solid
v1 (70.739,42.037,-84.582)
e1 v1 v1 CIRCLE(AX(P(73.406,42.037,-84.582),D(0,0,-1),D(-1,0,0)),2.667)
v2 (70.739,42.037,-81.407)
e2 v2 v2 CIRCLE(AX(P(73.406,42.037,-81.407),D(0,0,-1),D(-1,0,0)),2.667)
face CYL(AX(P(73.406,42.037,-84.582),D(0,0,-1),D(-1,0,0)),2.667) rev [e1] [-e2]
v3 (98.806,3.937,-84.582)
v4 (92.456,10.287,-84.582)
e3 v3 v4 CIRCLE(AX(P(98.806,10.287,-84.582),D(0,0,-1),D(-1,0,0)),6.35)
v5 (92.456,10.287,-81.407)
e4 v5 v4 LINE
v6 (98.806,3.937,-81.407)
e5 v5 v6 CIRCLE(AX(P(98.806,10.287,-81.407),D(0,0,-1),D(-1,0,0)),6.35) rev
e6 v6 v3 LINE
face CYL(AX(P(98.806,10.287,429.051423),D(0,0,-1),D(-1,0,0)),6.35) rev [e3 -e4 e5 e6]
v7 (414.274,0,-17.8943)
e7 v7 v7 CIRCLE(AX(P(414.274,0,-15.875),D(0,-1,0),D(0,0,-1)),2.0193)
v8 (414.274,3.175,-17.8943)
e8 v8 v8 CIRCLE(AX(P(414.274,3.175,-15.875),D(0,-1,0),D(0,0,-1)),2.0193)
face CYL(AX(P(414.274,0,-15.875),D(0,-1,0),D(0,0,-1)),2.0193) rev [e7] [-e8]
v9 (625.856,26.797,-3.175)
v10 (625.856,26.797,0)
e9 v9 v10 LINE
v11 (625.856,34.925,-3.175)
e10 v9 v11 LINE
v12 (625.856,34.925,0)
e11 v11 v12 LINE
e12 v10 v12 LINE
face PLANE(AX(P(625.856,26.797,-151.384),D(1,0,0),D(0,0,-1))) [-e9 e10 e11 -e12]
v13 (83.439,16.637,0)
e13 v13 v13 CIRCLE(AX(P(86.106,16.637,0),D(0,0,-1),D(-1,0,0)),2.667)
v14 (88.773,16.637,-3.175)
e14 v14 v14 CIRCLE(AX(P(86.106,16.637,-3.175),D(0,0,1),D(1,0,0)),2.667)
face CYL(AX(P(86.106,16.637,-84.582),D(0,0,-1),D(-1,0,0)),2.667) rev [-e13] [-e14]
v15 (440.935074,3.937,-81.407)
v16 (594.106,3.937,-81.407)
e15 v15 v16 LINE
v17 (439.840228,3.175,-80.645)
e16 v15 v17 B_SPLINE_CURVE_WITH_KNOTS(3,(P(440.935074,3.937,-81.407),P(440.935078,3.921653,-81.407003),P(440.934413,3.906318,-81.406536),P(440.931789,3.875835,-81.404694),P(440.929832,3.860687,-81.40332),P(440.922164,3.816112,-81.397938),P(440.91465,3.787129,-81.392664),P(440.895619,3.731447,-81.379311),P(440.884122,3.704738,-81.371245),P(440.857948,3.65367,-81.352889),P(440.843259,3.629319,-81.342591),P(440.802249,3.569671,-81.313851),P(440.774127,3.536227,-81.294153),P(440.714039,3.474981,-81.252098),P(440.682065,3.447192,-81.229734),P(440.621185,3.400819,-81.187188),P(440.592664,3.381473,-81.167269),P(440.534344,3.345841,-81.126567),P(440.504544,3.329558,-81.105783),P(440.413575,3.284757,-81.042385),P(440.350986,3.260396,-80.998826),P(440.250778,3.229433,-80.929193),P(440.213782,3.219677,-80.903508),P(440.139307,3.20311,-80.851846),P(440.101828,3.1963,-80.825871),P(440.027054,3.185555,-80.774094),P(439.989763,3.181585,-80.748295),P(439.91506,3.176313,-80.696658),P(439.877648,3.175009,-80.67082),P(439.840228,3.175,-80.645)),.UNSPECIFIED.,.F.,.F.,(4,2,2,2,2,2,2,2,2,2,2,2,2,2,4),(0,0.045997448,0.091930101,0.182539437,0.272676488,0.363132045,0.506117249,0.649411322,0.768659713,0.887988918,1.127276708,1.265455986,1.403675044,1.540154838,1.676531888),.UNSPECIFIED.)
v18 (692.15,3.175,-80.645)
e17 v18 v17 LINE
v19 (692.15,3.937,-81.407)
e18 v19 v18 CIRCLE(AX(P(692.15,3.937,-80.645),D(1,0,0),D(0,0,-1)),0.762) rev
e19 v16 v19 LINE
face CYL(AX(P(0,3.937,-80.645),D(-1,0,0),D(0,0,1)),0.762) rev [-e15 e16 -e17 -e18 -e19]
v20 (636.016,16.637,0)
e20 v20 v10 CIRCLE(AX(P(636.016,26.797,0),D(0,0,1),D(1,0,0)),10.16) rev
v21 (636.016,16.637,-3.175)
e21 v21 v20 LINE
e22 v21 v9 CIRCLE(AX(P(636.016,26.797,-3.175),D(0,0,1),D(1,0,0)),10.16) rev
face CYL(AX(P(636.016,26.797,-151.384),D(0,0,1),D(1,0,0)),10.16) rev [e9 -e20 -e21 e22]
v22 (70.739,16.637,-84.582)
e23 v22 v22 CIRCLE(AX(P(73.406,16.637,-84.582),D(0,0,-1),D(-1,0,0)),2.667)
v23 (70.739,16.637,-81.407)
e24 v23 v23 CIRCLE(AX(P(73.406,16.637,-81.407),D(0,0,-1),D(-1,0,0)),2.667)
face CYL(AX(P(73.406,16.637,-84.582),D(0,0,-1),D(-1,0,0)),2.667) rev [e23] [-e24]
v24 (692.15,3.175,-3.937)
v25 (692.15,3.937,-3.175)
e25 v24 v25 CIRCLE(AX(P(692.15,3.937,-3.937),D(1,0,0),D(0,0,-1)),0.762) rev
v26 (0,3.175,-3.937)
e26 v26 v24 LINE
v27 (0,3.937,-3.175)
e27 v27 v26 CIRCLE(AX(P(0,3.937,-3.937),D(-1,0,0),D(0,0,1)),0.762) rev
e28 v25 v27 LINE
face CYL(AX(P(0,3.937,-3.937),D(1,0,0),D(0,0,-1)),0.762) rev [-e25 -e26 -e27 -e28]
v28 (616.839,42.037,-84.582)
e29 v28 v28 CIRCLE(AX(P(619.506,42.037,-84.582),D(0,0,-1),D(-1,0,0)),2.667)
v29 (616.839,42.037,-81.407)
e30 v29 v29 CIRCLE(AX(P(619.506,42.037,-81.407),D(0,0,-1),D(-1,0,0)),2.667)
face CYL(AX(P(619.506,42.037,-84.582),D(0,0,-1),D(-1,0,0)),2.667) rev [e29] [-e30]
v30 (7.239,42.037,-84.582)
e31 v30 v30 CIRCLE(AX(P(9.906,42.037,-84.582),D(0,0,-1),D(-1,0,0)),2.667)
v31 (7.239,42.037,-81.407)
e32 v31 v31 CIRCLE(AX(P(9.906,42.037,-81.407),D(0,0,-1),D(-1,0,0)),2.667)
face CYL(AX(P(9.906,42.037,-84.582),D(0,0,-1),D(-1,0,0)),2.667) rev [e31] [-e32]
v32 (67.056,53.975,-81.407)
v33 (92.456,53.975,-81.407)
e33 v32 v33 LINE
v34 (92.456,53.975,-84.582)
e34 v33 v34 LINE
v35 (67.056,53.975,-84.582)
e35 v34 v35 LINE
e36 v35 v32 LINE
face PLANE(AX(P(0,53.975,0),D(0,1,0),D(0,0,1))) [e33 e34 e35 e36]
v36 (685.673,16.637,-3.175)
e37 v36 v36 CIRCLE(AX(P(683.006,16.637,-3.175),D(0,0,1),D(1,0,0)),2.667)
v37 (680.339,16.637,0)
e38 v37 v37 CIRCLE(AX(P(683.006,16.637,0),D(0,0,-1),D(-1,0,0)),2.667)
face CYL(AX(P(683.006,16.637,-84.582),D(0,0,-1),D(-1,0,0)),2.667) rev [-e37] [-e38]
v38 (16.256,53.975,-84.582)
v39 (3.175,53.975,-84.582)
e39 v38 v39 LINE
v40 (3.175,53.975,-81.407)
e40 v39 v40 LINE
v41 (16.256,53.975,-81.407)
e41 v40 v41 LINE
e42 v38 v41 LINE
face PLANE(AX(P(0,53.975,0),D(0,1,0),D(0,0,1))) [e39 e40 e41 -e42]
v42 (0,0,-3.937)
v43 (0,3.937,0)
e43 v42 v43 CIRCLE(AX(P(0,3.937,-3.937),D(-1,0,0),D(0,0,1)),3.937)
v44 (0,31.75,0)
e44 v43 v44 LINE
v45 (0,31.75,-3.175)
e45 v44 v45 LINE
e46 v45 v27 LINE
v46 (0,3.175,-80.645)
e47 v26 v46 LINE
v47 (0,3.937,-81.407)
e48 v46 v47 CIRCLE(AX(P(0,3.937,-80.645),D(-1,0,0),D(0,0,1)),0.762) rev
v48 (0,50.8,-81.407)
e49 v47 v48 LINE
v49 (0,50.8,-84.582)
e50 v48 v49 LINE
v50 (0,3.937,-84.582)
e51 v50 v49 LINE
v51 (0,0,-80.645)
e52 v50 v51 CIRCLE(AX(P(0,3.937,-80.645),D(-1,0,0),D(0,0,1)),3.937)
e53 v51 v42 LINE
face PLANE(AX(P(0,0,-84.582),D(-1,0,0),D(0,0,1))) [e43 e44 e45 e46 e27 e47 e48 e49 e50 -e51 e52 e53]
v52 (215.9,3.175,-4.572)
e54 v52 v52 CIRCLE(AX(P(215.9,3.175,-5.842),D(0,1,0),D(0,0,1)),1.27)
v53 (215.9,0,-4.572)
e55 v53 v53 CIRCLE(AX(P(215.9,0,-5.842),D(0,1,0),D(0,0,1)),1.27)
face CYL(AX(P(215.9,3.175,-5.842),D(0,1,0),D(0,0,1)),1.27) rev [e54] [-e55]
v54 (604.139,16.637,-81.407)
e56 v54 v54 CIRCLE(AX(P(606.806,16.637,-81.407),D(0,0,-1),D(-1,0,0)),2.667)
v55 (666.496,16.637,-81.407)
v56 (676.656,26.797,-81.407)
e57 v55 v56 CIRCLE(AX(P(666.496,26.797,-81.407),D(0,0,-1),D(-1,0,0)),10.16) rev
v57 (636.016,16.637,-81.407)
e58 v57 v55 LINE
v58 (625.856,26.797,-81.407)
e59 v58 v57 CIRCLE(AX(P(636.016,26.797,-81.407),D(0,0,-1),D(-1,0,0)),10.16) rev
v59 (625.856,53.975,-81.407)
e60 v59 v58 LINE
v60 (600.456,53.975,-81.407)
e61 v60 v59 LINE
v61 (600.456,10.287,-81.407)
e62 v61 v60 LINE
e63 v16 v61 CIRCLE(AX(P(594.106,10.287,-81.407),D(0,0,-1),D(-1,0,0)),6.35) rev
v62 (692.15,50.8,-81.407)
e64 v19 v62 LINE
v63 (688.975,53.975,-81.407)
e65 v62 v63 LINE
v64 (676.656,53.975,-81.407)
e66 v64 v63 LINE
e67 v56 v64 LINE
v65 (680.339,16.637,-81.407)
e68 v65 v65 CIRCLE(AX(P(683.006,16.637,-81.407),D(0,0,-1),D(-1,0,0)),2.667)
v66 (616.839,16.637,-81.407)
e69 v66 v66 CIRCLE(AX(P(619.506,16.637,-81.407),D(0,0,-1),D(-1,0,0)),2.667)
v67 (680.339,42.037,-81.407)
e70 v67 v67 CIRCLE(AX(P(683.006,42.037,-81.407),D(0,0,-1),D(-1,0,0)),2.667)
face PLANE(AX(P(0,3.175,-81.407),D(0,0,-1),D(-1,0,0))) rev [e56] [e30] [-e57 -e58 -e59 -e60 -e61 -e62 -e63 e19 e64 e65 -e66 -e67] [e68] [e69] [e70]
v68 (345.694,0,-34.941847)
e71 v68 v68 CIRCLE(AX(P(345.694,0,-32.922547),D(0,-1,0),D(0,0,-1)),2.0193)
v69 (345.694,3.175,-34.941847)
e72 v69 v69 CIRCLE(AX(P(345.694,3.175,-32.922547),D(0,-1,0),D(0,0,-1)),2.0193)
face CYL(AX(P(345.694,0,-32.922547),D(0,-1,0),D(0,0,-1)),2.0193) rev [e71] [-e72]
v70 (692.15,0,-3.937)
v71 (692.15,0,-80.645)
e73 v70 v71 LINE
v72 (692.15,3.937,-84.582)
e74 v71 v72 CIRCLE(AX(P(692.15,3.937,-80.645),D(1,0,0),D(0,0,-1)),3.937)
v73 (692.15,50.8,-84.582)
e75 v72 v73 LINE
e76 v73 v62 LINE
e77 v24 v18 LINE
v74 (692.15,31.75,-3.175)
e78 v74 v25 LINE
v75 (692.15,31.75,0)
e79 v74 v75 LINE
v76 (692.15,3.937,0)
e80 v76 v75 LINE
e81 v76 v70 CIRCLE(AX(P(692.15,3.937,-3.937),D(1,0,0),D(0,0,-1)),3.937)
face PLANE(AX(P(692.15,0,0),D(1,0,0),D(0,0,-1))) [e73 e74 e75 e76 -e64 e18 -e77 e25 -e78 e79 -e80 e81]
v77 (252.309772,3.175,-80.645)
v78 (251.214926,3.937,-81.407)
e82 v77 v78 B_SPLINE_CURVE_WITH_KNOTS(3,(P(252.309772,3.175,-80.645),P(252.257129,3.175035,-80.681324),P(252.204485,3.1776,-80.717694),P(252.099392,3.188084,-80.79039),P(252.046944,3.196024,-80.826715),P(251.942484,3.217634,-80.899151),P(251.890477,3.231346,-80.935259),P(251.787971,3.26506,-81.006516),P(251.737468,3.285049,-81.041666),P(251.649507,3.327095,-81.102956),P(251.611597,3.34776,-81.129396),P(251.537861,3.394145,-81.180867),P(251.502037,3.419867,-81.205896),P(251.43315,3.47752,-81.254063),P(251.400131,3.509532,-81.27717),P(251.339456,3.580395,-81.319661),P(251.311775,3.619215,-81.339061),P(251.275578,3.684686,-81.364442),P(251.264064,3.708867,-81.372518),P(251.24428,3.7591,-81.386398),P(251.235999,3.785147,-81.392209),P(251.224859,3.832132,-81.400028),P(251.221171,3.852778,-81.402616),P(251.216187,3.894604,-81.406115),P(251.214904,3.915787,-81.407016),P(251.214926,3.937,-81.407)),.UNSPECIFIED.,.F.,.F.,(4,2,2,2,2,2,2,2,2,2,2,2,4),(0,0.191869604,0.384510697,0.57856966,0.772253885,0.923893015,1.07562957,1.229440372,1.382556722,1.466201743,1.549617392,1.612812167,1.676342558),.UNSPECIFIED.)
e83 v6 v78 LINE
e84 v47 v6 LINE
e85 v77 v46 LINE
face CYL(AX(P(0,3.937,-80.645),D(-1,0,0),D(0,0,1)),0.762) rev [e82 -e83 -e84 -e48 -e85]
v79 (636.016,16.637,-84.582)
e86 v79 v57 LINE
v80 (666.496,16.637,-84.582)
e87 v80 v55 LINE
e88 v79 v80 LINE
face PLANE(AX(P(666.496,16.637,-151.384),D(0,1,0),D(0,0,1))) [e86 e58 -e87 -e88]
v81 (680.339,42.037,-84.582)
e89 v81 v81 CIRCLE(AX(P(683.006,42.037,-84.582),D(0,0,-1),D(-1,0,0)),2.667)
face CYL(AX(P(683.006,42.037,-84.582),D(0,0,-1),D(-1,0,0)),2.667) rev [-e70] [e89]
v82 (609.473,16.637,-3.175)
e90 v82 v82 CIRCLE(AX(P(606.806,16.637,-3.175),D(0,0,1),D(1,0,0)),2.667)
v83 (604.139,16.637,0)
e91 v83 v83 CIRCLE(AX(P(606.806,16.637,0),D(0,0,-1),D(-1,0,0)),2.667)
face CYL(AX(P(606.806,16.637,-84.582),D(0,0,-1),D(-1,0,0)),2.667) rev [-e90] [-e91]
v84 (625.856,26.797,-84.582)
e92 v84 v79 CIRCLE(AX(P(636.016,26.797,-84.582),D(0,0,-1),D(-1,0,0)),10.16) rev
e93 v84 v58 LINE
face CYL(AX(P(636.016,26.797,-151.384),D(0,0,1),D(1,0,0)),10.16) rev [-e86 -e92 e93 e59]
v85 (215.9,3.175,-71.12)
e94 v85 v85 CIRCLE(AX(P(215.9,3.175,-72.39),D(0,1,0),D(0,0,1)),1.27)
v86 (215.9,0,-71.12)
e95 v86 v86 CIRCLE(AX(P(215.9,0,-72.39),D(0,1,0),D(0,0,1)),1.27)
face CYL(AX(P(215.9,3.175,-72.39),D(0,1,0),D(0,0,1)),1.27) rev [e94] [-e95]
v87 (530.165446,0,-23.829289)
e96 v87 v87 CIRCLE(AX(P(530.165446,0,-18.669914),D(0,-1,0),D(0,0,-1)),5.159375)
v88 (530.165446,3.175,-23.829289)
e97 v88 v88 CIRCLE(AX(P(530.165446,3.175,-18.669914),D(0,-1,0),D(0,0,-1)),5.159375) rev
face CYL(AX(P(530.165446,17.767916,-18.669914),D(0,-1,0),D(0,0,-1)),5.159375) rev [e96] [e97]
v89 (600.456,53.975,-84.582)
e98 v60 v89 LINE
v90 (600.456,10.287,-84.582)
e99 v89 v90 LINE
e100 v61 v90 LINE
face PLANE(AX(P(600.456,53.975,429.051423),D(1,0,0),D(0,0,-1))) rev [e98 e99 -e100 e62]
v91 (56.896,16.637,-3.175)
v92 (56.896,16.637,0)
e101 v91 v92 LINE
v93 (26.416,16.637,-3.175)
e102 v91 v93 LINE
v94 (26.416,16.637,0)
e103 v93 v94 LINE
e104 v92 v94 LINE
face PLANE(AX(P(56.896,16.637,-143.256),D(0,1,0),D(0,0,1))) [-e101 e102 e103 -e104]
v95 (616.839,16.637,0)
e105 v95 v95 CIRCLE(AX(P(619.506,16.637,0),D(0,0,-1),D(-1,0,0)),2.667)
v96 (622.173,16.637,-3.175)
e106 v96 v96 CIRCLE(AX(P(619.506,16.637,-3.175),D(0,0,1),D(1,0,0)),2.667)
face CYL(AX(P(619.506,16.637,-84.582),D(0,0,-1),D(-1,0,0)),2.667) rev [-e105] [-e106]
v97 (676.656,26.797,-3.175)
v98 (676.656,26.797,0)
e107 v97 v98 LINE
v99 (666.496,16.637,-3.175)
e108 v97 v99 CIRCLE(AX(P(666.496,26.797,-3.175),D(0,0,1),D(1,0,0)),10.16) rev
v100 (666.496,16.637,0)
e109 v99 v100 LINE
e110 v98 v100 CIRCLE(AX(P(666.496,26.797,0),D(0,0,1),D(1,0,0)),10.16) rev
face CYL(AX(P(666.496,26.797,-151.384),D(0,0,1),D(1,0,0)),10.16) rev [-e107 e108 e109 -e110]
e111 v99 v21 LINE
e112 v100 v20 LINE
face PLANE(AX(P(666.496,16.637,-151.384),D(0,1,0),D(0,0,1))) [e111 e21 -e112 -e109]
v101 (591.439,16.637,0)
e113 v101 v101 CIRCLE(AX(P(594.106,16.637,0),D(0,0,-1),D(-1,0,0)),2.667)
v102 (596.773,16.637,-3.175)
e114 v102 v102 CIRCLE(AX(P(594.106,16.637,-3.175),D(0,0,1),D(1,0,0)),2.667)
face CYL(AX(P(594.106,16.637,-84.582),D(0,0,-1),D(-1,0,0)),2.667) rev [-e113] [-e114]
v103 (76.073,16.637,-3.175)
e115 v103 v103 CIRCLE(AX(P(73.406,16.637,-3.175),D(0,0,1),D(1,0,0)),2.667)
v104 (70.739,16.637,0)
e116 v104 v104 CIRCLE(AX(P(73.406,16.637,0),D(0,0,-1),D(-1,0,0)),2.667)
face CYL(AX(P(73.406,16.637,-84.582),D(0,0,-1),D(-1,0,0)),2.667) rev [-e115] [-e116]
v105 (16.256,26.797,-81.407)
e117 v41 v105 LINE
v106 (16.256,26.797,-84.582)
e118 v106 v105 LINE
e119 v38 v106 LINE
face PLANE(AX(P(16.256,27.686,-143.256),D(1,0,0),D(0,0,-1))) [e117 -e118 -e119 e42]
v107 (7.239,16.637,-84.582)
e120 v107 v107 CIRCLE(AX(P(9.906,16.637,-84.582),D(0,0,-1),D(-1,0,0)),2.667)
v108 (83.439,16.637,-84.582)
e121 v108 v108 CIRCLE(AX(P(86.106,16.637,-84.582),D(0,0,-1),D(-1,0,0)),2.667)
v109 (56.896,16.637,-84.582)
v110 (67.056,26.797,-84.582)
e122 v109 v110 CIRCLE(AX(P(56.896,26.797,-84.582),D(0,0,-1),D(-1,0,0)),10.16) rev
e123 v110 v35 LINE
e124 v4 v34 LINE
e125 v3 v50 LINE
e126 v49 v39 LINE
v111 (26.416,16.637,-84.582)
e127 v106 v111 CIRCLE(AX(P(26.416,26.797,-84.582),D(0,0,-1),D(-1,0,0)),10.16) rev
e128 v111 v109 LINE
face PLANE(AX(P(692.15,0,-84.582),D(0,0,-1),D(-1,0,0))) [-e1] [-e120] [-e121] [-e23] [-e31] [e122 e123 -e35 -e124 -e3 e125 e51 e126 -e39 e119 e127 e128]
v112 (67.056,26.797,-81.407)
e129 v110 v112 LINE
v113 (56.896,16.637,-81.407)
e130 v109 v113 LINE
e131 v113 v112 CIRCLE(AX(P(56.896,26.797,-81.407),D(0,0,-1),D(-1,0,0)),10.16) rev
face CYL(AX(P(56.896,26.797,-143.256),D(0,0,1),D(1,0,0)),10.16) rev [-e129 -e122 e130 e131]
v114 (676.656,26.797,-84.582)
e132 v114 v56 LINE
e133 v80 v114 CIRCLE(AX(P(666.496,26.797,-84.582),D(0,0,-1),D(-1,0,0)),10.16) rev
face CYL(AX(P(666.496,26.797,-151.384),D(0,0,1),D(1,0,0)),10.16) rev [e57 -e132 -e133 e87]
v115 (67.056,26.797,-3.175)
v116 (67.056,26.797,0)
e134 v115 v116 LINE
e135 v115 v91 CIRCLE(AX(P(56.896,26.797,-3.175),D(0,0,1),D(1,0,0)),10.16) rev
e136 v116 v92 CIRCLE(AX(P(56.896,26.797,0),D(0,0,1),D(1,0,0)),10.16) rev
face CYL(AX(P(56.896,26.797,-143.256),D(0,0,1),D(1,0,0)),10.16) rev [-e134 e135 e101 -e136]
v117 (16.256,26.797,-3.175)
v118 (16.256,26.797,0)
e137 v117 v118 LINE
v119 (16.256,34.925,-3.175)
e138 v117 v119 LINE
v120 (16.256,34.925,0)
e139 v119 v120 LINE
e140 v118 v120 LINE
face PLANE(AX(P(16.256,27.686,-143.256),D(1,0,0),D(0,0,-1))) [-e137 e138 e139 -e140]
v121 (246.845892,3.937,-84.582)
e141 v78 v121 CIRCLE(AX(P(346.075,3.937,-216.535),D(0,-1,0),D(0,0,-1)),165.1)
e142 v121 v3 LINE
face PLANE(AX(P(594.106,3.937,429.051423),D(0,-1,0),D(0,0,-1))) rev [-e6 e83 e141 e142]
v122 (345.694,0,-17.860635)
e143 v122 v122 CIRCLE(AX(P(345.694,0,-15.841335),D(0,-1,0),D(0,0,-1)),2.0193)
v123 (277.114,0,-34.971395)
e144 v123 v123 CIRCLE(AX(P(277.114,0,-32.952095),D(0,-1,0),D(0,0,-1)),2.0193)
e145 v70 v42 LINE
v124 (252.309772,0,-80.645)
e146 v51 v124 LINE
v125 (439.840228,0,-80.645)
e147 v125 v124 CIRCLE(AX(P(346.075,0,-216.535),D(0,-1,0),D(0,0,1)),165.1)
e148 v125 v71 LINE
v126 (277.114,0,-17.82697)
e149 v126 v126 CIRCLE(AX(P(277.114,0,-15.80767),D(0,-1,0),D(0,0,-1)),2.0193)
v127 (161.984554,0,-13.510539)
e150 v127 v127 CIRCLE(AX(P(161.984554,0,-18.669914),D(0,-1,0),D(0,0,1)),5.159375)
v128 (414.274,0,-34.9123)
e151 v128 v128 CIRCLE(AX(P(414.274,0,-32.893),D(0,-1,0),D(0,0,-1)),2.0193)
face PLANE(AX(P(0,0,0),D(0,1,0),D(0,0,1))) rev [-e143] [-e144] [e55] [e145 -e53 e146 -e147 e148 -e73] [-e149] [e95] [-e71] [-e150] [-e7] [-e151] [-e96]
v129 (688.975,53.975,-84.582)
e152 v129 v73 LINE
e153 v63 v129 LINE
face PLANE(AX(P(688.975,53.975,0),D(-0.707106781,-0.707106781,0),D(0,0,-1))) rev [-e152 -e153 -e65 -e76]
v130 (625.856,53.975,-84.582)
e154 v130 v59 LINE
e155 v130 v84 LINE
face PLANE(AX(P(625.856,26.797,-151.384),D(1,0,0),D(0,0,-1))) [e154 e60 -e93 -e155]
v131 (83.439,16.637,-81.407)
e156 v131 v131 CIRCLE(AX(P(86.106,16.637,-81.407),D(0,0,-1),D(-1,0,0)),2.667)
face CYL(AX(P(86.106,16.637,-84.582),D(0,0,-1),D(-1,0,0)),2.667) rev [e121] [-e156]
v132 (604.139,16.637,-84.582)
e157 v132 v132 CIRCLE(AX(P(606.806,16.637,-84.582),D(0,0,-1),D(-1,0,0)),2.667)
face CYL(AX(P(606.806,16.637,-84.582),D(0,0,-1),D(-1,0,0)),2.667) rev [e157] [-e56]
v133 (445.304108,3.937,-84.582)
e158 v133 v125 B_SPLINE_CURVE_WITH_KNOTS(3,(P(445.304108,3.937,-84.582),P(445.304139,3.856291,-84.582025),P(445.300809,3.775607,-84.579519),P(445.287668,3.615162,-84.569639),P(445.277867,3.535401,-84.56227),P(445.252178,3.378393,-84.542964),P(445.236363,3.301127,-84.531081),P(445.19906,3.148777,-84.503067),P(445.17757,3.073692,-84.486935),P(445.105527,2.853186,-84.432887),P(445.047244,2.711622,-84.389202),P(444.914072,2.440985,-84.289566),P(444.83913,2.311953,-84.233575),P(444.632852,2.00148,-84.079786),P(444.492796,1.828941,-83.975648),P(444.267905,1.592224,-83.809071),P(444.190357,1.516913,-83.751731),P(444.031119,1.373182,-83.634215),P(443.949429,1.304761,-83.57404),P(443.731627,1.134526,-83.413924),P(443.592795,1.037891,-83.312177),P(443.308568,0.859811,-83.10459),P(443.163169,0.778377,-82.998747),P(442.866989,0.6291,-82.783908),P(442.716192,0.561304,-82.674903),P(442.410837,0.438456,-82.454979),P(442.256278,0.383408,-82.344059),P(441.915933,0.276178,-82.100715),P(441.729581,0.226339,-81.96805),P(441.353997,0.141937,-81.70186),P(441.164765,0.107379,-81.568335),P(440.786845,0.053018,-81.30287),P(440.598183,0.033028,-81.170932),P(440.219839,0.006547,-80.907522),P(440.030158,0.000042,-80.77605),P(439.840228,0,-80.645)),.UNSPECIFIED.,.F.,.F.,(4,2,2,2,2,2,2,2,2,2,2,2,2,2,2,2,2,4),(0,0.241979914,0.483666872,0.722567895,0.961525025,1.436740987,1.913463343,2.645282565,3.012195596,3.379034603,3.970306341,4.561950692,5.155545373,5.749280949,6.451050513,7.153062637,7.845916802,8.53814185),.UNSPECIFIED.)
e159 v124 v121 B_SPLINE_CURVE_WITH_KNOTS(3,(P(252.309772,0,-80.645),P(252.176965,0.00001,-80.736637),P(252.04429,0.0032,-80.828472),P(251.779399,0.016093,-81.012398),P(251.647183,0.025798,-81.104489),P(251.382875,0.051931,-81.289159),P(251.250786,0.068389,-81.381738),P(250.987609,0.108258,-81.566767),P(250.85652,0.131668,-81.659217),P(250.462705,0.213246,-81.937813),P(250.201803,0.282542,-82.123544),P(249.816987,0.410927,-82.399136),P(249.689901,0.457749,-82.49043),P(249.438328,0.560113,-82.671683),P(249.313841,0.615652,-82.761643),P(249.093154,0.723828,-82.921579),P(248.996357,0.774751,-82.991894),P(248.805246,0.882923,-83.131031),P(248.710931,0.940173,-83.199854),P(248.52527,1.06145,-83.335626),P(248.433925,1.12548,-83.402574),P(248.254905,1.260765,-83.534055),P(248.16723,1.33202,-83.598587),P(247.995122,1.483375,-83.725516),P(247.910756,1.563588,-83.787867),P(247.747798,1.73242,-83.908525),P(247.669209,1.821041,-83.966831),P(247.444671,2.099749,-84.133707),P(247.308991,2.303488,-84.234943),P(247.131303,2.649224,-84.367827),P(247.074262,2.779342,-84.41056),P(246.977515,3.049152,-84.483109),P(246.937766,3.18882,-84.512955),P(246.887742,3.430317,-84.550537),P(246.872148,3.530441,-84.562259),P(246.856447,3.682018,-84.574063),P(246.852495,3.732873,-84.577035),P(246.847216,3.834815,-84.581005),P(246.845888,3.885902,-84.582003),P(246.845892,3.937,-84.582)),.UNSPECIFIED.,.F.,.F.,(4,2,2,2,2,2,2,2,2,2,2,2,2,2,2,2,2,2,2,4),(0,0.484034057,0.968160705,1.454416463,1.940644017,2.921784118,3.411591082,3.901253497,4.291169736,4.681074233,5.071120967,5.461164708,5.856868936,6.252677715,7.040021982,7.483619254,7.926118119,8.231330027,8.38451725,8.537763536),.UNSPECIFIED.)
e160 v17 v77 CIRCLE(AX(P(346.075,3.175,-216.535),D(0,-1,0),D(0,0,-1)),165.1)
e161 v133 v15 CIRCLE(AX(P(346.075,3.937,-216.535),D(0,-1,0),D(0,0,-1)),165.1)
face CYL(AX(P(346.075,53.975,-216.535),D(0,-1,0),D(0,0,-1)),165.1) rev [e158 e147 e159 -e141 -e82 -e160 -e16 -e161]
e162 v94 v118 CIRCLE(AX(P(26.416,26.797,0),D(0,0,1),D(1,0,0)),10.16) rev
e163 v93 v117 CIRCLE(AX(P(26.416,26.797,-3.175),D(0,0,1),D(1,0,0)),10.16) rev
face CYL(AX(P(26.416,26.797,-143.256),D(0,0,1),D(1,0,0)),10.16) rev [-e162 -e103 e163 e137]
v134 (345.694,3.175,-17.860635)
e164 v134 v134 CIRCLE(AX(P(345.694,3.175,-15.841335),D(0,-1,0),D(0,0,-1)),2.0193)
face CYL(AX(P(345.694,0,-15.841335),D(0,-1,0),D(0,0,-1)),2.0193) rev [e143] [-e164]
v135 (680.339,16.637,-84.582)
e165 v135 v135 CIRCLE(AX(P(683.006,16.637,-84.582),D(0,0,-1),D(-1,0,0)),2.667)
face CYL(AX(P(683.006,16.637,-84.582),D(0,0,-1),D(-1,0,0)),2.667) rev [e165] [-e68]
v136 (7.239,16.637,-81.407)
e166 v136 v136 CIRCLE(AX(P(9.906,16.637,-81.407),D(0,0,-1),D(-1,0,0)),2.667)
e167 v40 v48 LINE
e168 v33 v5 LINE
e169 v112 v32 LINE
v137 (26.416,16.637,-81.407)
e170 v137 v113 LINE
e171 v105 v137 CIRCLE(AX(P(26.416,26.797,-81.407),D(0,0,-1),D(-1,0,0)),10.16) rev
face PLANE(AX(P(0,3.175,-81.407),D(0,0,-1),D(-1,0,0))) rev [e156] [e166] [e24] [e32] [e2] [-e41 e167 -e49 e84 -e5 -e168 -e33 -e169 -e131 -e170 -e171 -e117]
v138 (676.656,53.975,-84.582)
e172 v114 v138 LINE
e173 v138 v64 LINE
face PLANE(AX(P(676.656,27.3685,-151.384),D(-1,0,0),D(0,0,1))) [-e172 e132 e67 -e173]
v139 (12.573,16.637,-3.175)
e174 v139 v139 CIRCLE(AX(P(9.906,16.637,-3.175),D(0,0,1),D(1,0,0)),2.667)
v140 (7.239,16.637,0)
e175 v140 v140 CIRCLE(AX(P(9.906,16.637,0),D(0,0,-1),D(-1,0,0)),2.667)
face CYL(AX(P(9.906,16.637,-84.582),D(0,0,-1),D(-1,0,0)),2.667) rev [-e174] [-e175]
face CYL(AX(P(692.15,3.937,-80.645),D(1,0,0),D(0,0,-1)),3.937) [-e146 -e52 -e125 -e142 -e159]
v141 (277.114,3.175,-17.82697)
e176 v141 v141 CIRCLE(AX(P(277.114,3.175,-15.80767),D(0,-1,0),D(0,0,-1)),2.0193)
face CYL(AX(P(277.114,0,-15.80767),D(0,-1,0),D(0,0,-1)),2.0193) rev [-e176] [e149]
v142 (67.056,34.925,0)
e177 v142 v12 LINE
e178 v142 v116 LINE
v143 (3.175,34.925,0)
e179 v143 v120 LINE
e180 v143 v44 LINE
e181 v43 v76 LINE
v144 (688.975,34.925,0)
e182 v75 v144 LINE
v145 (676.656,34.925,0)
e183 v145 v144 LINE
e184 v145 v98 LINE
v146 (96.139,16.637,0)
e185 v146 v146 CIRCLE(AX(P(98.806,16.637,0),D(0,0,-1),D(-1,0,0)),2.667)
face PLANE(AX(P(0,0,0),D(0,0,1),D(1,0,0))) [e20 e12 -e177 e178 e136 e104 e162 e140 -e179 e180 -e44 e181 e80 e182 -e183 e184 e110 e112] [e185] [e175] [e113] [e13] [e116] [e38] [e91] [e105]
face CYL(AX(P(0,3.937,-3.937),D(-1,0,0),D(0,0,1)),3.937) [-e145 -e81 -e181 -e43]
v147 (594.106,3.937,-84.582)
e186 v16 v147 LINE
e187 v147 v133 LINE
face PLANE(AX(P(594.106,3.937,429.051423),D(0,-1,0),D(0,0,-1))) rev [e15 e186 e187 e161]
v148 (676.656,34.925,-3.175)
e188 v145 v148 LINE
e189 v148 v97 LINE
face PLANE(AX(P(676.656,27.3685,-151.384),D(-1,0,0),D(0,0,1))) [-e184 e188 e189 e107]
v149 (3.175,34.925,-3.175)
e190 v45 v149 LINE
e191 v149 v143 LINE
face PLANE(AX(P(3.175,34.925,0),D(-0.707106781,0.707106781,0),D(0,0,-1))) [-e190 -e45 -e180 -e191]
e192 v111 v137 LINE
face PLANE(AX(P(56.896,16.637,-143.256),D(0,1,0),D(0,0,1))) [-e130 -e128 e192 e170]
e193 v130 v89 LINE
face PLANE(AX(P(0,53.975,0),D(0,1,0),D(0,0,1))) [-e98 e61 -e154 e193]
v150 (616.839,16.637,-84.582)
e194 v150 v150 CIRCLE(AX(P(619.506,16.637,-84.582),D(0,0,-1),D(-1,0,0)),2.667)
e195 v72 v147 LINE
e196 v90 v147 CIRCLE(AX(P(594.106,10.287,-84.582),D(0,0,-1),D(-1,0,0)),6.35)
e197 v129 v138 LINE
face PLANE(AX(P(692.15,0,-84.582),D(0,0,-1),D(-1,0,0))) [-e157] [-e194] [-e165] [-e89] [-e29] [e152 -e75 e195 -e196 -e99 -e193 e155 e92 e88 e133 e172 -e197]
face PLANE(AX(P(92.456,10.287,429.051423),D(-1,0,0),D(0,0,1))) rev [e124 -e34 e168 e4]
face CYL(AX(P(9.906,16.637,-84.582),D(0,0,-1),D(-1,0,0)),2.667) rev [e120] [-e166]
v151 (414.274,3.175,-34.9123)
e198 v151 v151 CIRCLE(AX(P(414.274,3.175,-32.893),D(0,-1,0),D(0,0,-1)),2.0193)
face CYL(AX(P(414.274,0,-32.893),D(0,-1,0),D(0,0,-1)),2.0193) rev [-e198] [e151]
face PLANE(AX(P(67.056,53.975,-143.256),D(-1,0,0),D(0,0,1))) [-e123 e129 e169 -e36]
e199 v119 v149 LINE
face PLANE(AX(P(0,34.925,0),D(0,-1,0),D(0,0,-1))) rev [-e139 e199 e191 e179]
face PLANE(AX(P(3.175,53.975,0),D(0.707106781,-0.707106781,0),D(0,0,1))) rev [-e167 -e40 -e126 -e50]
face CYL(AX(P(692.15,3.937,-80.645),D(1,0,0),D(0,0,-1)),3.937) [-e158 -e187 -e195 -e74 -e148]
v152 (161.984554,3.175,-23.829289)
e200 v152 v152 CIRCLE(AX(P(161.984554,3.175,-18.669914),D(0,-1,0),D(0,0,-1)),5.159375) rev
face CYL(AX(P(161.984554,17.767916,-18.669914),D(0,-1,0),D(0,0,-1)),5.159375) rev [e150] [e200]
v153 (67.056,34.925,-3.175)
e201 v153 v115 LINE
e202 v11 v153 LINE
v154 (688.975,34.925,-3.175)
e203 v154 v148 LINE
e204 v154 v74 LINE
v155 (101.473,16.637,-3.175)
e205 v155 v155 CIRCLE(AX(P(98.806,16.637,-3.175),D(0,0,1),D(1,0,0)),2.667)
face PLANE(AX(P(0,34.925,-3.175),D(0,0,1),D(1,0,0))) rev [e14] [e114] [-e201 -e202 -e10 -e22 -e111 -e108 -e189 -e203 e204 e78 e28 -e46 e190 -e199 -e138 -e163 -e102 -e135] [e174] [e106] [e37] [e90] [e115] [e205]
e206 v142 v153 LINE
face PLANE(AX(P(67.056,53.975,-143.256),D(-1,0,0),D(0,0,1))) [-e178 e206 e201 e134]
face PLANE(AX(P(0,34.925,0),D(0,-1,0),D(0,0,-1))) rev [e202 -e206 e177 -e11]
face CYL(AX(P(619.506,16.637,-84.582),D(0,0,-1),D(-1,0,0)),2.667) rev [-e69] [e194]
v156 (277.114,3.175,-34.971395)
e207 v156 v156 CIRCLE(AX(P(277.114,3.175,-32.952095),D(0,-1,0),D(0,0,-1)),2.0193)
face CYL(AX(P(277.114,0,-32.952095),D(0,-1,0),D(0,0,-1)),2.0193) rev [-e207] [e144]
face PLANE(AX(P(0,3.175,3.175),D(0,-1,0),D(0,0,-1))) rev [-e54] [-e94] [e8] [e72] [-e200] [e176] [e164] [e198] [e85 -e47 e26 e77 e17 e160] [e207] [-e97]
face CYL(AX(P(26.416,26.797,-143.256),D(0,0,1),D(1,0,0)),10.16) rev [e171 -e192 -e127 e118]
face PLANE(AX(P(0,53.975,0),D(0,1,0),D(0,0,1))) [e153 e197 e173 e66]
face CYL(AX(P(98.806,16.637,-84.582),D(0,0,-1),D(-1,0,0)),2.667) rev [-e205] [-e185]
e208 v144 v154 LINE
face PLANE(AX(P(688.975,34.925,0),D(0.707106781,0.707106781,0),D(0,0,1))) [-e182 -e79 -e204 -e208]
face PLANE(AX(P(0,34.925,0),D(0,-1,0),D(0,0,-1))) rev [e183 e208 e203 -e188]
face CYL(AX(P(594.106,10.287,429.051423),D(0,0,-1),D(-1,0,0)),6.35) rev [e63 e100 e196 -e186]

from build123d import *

# Parameters (mm, degrees)
SKETCH1_W                    = 692.15
SKETCH1_H                    = 84.582
BOSS_EXTRUDE1_DEPTH          = 53.975
SKETCH2_W                    = 84.582
SKETCH2_H                    = 50.8
CUT_EXTRUDE1_DEPTH           = 700.38475666
SKETCH3_W                    = 692.15
SKETCH3_H                    = 3.175
BOSS_EXTRUDE2_DEPTH          = 31.75
M2_CLEARANCE_HOLE1_D         = 2.54
M5_START                     = -84.582
M5_CLEARANCE_HOLE2_OUTLINE_R = 2.667
M5_CLEARANCE_HOLE2_DEPTH     = 84.582
CHAMFER1_SIZE                = 3.175
FILLET1_R                    = 0.762
FILLET2_R                    = 3.937
CUT_EXTRUDE7_DEPTH           = 58.674
CUT_EXTRUDE7_DEPTH_BACK      = 182.626
CUT_EXTRUDE8_DEPTH           = 66.802
CUT_EXTRUDE8_DEPTH_BACK      = 191.516
CUT_EXTRUDE9_REACH           = 701.385
CUT_EXTRUDE10_DEPTH          = 700.38475666
F_10_32_TAPPED_HOLE1_D       = 4.0386
F_10_32_TAPPED_HOLE1_DEPTH   = 13.716
F_10_32_TAPPED_HOLE1_TIP     = 1.213317848
SKETCH22_R                   = 5.159375
CUT_EXTRUDE11_DEPTH          = 3.175


# Read off the part's stored shape, not the designer's step: M5 Clearance Hole2
with BuildPart() as part:
    # Sketch1 → Boss-Extrude1 (new body)
    with BuildSketch(Plane(origin=(0, 53.975, 0), x_dir=(1, 0, 0), z_dir=(0, 1, 0))):
        with Locations((346.075, 42.291)):
            Rectangle(SKETCH1_W, SKETCH1_H)
    extrude(amount=-BOSS_EXTRUDE1_DEPTH)

    # Sketch2 → Cut-Extrude1 (cut, through all)
    with BuildSketch(Plane(origin=(692.15, 0, 0), x_dir=(0, 0, -1), z_dir=(1, 0, 0))):
        with Locations((39.116, 28.575)):
            Rectangle(SKETCH2_W, SKETCH2_H)
    extrude(amount=-CUT_EXTRUDE1_DEPTH, mode=Mode.SUBTRACT)

    # Sketch3 → Boss-Extrude2 (add)
    with BuildSketch(Plane(origin=(0, 3.175, 0), x_dir=(-1, 0, 0), z_dir=(0, 1, 0))):
        with Locations((-346.075, -1.5875)):
            Rectangle(SKETCH3_W, SKETCH3_H)
    extrude(amount=BOSS_EXTRUDE2_DEPTH)

    # M2 Clearance Hole1 (through all)
    with Locations(Plane(origin=(0, 3.175, 0), x_dir=(1, 0, 0), z_dir=(0, 1, 0))):
        with Locations((215.9, 5.842), (215.9, 72.39)):
            Hole(M2_CLEARANCE_HOLE1_D / 2)

    # M5 Clearance Hole2 outline → M5 Clearance Hole2 (cut)
    with BuildSketch(Plane.XY.offset(M5_START)):
        with Locations((683.006, 42.037)):
            Circle(M5_CLEARANCE_HOLE2_OUTLINE_R)
        with Locations((670.306, 42.037)):
            Circle(M5_CLEARANCE_HOLE2_OUTLINE_R)
        with Locations((657.606, 42.037)):
            Circle(M5_CLEARANCE_HOLE2_OUTLINE_R)
        with Locations((644.906, 42.037)):
            Circle(M5_CLEARANCE_HOLE2_OUTLINE_R)
        with Locations((632.206, 42.037)):
            Circle(M5_CLEARANCE_HOLE2_OUTLINE_R)
        with Locations((619.506, 42.037)):
            Circle(M5_CLEARANCE_HOLE2_OUTLINE_R)
        with Locations((594.106, 42.037)):
            Circle(M5_CLEARANCE_HOLE2_OUTLINE_R)
        with Locations((581.406, 42.037)):
            Circle(M5_CLEARANCE_HOLE2_OUTLINE_R)
        with Locations((568.706, 42.037)):
            Circle(M5_CLEARANCE_HOLE2_OUTLINE_R)
        with Locations((556.006, 42.037)):
            Circle(M5_CLEARANCE_HOLE2_OUTLINE_R)
        with Locations((543.306, 42.037)):
            Circle(M5_CLEARANCE_HOLE2_OUTLINE_R)
        with Locations((530.606, 42.037)):
            Circle(M5_CLEARANCE_HOLE2_OUTLINE_R)
        with Locations((517.906, 42.037)):
            Circle(M5_CLEARANCE_HOLE2_OUTLINE_R)
        with Locations((505.206, 42.037)):
            Circle(M5_CLEARANCE_HOLE2_OUTLINE_R)
        with Locations((492.506, 42.037)):
            Circle(M5_CLEARANCE_HOLE2_OUTLINE_R)
        with Locations((479.806, 42.037)):
            Circle(M5_CLEARANCE_HOLE2_OUTLINE_R)
        with Locations((467.106, 42.037)):
            Circle(M5_CLEARANCE_HOLE2_OUTLINE_R)
        with Locations((454.406, 42.037)):
            Circle(M5_CLEARANCE_HOLE2_OUTLINE_R)
        with Locations((441.706, 42.037)):
            Circle(M5_CLEARANCE_HOLE2_OUTLINE_R)
        with Locations((429.006, 42.037)):
            Circle(M5_CLEARANCE_HOLE2_OUTLINE_R)
        with Locations((416.306, 42.037)):
            Circle(M5_CLEARANCE_HOLE2_OUTLINE_R)
        with Locations((403.606, 42.037)):
            Circle(M5_CLEARANCE_HOLE2_OUTLINE_R)
        with Locations((390.906, 42.037)):
            Circle(M5_CLEARANCE_HOLE2_OUTLINE_R)
        with Locations((378.206, 42.037)):
            Circle(M5_CLEARANCE_HOLE2_OUTLINE_R)
        with Locations((365.506, 42.037)):
            Circle(M5_CLEARANCE_HOLE2_OUTLINE_R)
        with Locations((352.806, 42.037)):
            Circle(M5_CLEARANCE_HOLE2_OUTLINE_R)
        with Locations((340.106, 42.037)):
            Circle(M5_CLEARANCE_HOLE2_OUTLINE_R)
        with Locations((327.406, 42.037)):
            Circle(M5_CLEARANCE_HOLE2_OUTLINE_R)
        with Locations((314.706, 42.037)):
            Circle(M5_CLEARANCE_HOLE2_OUTLINE_R)
        with Locations((302.006, 42.037)):
            Circle(M5_CLEARANCE_HOLE2_OUTLINE_R)
        with Locations((289.306, 42.037)):
            Circle(M5_CLEARANCE_HOLE2_OUTLINE_R)
        with Locations((276.606, 42.037)):
            Circle(M5_CLEARANCE_HOLE2_OUTLINE_R)
        with Locations((263.906, 42.037)):
            Circle(M5_CLEARANCE_HOLE2_OUTLINE_R)
        with Locations((251.206, 42.037)):
            Circle(M5_CLEARANCE_HOLE2_OUTLINE_R)
        with Locations((238.506, 42.037)):
            Circle(M5_CLEARANCE_HOLE2_OUTLINE_R)
        with Locations((225.806, 42.037)):
            Circle(M5_CLEARANCE_HOLE2_OUTLINE_R)
        with Locations((213.106, 42.037)):
            Circle(M5_CLEARANCE_HOLE2_OUTLINE_R)
        with Locations((200.406, 42.037)):
            Circle(M5_CLEARANCE_HOLE2_OUTLINE_R)
        with Locations((187.706, 42.037)):
            Circle(M5_CLEARANCE_HOLE2_OUTLINE_R)
        with Locations((175.006, 42.037)):
            Circle(M5_CLEARANCE_HOLE2_OUTLINE_R)
        with Locations((162.306, 42.037)):
            Circle(M5_CLEARANCE_HOLE2_OUTLINE_R)
        with Locations((149.606, 42.037)):
            Circle(M5_CLEARANCE_HOLE2_OUTLINE_R)
        with Locations((136.906, 42.037)):
            Circle(M5_CLEARANCE_HOLE2_OUTLINE_R)
        with Locations((124.206, 42.037)):
            Circle(M5_CLEARANCE_HOLE2_OUTLINE_R)
        with Locations((683.006, 16.637)):
            Circle(M5_CLEARANCE_HOLE2_OUTLINE_R)
        with Locations((619.506, 16.637)):
            Circle(M5_CLEARANCE_HOLE2_OUTLINE_R)
        with Locations((606.806, 16.637)):
            Circle(M5_CLEARANCE_HOLE2_OUTLINE_R)
        with Locations((594.106, 16.637)):
            Circle(M5_CLEARANCE_HOLE2_OUTLINE_R)
        with Locations((111.506, 42.037)):
            Circle(M5_CLEARANCE_HOLE2_OUTLINE_R)
        with Locations((98.806, 42.037)):
            Circle(M5_CLEARANCE_HOLE2_OUTLINE_R)
        with Locations((73.406, 42.037)):
            Circle(M5_CLEARANCE_HOLE2_OUTLINE_R)
        with Locations((60.706, 42.037)):
            Circle(M5_CLEARANCE_HOLE2_OUTLINE_R)
        with Locations((48.006, 42.037)):
            Circle(M5_CLEARANCE_HOLE2_OUTLINE_R)
        with Locations((35.306, 42.037)):
            Circle(M5_CLEARANCE_HOLE2_OUTLINE_R)
        with Locations((22.606, 42.037)):
            Circle(M5_CLEARANCE_HOLE2_OUTLINE_R)
        with Locations((9.906, 42.037)):
            Circle(M5_CLEARANCE_HOLE2_OUTLINE_R)
        with Locations((98.806, 16.637)):
            Circle(M5_CLEARANCE_HOLE2_OUTLINE_R)
        with Locations((86.106, 16.637)):
            Circle(M5_CLEARANCE_HOLE2_OUTLINE_R)
        with Locations((73.406, 16.637)):
            Circle(M5_CLEARANCE_HOLE2_OUTLINE_R)
        with Locations((9.906, 16.637)):
            Circle(M5_CLEARANCE_HOLE2_OUTLINE_R)
    extrude(amount=M5_CLEARANCE_HOLE2_DEPTH, mode=Mode.SUBTRACT)

    # Chamfer1
    chamfer1_edges = [part.edges().sort_by_distance(p)[0] for p in [
        (692.15, 53.975, -82.9945),
        (0, 34.925, -1.5875),
        (692.15, 34.925, -1.5875),
        (0, 53.975, -82.9945),
    ]]
    chamfer(chamfer1_edges, length=CHAMFER1_SIZE)

    # Fillet1
    fillet1_edges = [part.edges().sort_by_distance(p)[0] for p in [
        (346.075, 3.175, -81.407),
        (346.075, 3.175, -3.175),
    ]]
    fillet(fillet1_edges, radius=FILLET1_R)

    # Fillet2
    fillet2_edges = [part.edges().sort_by_distance(p)[0] for p in [
        (346.075, 0, 0),
        (346.075, 0, -84.582),
    ]]
    fillet(fillet2_edges, radius=FILLET2_R)

    # Sketch15 → Cut-Extrude7 (cut, two sides: drawn at the far end of the back side and taken through both)
    with BuildSketch(Plane(origin=(0, 0, -84.582), x_dir=(-1, 0, 0), z_dir=(0, 0, -1)).offset(-CUT_EXTRUDE7_DEPTH_BACK)):
        with BuildLine():
            Line((-16.256, 27.686), (-16.256, 53.975))
            Line((-16.256, 53.975), (-67.056, 53.975))
            Line((-67.056, 53.975), (-67.056, 26.797))
            ThreePointArc((-67.056, 26.797), (-64.080204897, 19.612795103), (-56.896, 16.637))
            Line((-56.896, 16.637), (-26.416, 16.637))
            ThreePointArc((-26.416, 16.637), (-19.231795103, 19.612795103), (-16.256, 26.797))
            Line((-16.256, 26.797), (-16.256, 27.686))
        make_face()
    extrude(amount=CUT_EXTRUDE7_DEPTH + CUT_EXTRUDE7_DEPTH_BACK, mode=Mode.SUBTRACT)

    # Sketch16 → Cut-Extrude8 (cut, two sides: drawn at the far end of the back side and taken through both)
    with BuildSketch(Plane(origin=(0, 0, -84.582), x_dir=(-1, 0, 0), z_dir=(0, 0, -1)).offset(-CUT_EXTRUDE8_DEPTH_BACK)):
        with BuildLine():
            Line((-676.656, 27.3685), (-676.656, 26.797))
            ThreePointArc((-676.656, 26.797), (-673.680204897, 19.612795103), (-666.496, 16.637))
            Line((-666.496, 16.637), (-636.016, 16.637))
            ThreePointArc((-636.016, 16.637), (-628.831795103, 19.612795103), (-625.856, 26.797))
            Line((-625.856, 26.797), (-625.856, 53.975))
            Line((-625.856, 53.975), (-676.656, 53.975))
            Line((-676.656, 53.975), (-676.656, 27.3685))
        make_face()
    extrude(amount=CUT_EXTRUDE8_DEPTH + CUT_EXTRUDE8_DEPTH_BACK, mode=Mode.SUBTRACT)

    # Cut-Extrude9: up to this face of the body (flat: up to its plane)
    cut_extrude9_end = Plane(part.part.faces().sort_by_distance((346.012685058, 27.7502179, -81.407))[0])
    # Sketch17 → Cut-Extrude9 (cut, up to the picked face)
    with BuildSketch(Plane(origin=(0, 0, -84.582), x_dir=(-1, 0, 0), z_dir=(0, 0, -1)), mode=Mode.PRIVATE) as cut_extrude9_sk1:
        with BuildLine():
            Line((-600.456, 53.975), (-600.456, 10.287))
            ThreePointArc((-600.456, 10.287), (-598.596128061, 5.796871939), (-594.106, 3.937))
            Line((-594.106, 3.937), (-98.806, 3.937))
            ThreePointArc((-98.806, 3.937), (-94.315871939, 5.796871939), (-92.456, 10.287))
            Line((-92.456, 10.287), (-92.456, 53.975))
            Line((-92.456, 53.975), (-600.456, 53.975))
        make_face()
    cut_extrude9_tool1 = split(extrude(cut_extrude9_sk1.sketch, amount=-CUT_EXTRUDE9_REACH, mode=Mode.PRIVATE), bisect_by=cut_extrude9_end, keep=Keep.BOTH, mode=Mode.PRIVATE)
    add(cut_extrude9_tool1.solids().sort_by(Axis((346.456, 28.972079, -84.582), (0, 0, 1)))[0], mode=Mode.SUBTRACT)

    # Sketch18 → Cut-Extrude10 (cut, through all)
    with BuildSketch(Plane.XZ):
        with BuildLine():
            Line((246.845892421, -84.582), (445.304107579, -84.582))
            ThreePointArc((445.304107579, -84.582), (346.075, -51.435), (246.845892421, -84.582))
        make_face()
    extrude(amount=-CUT_EXTRUDE10_DEPTH, mode=Mode.SUBTRACT)

    # #10-32 Tapped Hole1
    with Locations(Plane(origin=(0, 0, 0), x_dir=(-1, 0, 0), z_dir=(0, -1, 0))):
        with Locations((-414.274, 32.893), (-414.274, 15.875), (-345.694, 15.841335103), (-345.694, 32.922547423), (-277.114, 32.952094846), (-277.114, 15.807670207)):
            Hole(F_10_32_TAPPED_HOLE1_D / 2, depth=F_10_32_TAPPED_HOLE1_DEPTH)
            with Locations((0, 0, -(F_10_32_TAPPED_HOLE1_DEPTH + F_10_32_TAPPED_HOLE1_TIP / 2))):  # 118° drill point
                Cone(0, F_10_32_TAPPED_HOLE1_D / 2, F_10_32_TAPPED_HOLE1_TIP, mode=Mode.SUBTRACT)

    # Sketch22 → Cut-Extrude11 (cut)
    with BuildSketch(Plane.XZ):
        with Locations(Location((161.98455352, -18.6699144, 0), (0, 0, 270))):
            Circle(SKETCH22_R)
        with Locations(Location((530.16544648, -18.6699144, 0), (0, 0, 270))):
            Circle(SKETCH22_R)
    extrude(amount=-CUT_EXTRUDE11_DEPTH, mode=Mode.SUBTRACT)


solid = part.part
